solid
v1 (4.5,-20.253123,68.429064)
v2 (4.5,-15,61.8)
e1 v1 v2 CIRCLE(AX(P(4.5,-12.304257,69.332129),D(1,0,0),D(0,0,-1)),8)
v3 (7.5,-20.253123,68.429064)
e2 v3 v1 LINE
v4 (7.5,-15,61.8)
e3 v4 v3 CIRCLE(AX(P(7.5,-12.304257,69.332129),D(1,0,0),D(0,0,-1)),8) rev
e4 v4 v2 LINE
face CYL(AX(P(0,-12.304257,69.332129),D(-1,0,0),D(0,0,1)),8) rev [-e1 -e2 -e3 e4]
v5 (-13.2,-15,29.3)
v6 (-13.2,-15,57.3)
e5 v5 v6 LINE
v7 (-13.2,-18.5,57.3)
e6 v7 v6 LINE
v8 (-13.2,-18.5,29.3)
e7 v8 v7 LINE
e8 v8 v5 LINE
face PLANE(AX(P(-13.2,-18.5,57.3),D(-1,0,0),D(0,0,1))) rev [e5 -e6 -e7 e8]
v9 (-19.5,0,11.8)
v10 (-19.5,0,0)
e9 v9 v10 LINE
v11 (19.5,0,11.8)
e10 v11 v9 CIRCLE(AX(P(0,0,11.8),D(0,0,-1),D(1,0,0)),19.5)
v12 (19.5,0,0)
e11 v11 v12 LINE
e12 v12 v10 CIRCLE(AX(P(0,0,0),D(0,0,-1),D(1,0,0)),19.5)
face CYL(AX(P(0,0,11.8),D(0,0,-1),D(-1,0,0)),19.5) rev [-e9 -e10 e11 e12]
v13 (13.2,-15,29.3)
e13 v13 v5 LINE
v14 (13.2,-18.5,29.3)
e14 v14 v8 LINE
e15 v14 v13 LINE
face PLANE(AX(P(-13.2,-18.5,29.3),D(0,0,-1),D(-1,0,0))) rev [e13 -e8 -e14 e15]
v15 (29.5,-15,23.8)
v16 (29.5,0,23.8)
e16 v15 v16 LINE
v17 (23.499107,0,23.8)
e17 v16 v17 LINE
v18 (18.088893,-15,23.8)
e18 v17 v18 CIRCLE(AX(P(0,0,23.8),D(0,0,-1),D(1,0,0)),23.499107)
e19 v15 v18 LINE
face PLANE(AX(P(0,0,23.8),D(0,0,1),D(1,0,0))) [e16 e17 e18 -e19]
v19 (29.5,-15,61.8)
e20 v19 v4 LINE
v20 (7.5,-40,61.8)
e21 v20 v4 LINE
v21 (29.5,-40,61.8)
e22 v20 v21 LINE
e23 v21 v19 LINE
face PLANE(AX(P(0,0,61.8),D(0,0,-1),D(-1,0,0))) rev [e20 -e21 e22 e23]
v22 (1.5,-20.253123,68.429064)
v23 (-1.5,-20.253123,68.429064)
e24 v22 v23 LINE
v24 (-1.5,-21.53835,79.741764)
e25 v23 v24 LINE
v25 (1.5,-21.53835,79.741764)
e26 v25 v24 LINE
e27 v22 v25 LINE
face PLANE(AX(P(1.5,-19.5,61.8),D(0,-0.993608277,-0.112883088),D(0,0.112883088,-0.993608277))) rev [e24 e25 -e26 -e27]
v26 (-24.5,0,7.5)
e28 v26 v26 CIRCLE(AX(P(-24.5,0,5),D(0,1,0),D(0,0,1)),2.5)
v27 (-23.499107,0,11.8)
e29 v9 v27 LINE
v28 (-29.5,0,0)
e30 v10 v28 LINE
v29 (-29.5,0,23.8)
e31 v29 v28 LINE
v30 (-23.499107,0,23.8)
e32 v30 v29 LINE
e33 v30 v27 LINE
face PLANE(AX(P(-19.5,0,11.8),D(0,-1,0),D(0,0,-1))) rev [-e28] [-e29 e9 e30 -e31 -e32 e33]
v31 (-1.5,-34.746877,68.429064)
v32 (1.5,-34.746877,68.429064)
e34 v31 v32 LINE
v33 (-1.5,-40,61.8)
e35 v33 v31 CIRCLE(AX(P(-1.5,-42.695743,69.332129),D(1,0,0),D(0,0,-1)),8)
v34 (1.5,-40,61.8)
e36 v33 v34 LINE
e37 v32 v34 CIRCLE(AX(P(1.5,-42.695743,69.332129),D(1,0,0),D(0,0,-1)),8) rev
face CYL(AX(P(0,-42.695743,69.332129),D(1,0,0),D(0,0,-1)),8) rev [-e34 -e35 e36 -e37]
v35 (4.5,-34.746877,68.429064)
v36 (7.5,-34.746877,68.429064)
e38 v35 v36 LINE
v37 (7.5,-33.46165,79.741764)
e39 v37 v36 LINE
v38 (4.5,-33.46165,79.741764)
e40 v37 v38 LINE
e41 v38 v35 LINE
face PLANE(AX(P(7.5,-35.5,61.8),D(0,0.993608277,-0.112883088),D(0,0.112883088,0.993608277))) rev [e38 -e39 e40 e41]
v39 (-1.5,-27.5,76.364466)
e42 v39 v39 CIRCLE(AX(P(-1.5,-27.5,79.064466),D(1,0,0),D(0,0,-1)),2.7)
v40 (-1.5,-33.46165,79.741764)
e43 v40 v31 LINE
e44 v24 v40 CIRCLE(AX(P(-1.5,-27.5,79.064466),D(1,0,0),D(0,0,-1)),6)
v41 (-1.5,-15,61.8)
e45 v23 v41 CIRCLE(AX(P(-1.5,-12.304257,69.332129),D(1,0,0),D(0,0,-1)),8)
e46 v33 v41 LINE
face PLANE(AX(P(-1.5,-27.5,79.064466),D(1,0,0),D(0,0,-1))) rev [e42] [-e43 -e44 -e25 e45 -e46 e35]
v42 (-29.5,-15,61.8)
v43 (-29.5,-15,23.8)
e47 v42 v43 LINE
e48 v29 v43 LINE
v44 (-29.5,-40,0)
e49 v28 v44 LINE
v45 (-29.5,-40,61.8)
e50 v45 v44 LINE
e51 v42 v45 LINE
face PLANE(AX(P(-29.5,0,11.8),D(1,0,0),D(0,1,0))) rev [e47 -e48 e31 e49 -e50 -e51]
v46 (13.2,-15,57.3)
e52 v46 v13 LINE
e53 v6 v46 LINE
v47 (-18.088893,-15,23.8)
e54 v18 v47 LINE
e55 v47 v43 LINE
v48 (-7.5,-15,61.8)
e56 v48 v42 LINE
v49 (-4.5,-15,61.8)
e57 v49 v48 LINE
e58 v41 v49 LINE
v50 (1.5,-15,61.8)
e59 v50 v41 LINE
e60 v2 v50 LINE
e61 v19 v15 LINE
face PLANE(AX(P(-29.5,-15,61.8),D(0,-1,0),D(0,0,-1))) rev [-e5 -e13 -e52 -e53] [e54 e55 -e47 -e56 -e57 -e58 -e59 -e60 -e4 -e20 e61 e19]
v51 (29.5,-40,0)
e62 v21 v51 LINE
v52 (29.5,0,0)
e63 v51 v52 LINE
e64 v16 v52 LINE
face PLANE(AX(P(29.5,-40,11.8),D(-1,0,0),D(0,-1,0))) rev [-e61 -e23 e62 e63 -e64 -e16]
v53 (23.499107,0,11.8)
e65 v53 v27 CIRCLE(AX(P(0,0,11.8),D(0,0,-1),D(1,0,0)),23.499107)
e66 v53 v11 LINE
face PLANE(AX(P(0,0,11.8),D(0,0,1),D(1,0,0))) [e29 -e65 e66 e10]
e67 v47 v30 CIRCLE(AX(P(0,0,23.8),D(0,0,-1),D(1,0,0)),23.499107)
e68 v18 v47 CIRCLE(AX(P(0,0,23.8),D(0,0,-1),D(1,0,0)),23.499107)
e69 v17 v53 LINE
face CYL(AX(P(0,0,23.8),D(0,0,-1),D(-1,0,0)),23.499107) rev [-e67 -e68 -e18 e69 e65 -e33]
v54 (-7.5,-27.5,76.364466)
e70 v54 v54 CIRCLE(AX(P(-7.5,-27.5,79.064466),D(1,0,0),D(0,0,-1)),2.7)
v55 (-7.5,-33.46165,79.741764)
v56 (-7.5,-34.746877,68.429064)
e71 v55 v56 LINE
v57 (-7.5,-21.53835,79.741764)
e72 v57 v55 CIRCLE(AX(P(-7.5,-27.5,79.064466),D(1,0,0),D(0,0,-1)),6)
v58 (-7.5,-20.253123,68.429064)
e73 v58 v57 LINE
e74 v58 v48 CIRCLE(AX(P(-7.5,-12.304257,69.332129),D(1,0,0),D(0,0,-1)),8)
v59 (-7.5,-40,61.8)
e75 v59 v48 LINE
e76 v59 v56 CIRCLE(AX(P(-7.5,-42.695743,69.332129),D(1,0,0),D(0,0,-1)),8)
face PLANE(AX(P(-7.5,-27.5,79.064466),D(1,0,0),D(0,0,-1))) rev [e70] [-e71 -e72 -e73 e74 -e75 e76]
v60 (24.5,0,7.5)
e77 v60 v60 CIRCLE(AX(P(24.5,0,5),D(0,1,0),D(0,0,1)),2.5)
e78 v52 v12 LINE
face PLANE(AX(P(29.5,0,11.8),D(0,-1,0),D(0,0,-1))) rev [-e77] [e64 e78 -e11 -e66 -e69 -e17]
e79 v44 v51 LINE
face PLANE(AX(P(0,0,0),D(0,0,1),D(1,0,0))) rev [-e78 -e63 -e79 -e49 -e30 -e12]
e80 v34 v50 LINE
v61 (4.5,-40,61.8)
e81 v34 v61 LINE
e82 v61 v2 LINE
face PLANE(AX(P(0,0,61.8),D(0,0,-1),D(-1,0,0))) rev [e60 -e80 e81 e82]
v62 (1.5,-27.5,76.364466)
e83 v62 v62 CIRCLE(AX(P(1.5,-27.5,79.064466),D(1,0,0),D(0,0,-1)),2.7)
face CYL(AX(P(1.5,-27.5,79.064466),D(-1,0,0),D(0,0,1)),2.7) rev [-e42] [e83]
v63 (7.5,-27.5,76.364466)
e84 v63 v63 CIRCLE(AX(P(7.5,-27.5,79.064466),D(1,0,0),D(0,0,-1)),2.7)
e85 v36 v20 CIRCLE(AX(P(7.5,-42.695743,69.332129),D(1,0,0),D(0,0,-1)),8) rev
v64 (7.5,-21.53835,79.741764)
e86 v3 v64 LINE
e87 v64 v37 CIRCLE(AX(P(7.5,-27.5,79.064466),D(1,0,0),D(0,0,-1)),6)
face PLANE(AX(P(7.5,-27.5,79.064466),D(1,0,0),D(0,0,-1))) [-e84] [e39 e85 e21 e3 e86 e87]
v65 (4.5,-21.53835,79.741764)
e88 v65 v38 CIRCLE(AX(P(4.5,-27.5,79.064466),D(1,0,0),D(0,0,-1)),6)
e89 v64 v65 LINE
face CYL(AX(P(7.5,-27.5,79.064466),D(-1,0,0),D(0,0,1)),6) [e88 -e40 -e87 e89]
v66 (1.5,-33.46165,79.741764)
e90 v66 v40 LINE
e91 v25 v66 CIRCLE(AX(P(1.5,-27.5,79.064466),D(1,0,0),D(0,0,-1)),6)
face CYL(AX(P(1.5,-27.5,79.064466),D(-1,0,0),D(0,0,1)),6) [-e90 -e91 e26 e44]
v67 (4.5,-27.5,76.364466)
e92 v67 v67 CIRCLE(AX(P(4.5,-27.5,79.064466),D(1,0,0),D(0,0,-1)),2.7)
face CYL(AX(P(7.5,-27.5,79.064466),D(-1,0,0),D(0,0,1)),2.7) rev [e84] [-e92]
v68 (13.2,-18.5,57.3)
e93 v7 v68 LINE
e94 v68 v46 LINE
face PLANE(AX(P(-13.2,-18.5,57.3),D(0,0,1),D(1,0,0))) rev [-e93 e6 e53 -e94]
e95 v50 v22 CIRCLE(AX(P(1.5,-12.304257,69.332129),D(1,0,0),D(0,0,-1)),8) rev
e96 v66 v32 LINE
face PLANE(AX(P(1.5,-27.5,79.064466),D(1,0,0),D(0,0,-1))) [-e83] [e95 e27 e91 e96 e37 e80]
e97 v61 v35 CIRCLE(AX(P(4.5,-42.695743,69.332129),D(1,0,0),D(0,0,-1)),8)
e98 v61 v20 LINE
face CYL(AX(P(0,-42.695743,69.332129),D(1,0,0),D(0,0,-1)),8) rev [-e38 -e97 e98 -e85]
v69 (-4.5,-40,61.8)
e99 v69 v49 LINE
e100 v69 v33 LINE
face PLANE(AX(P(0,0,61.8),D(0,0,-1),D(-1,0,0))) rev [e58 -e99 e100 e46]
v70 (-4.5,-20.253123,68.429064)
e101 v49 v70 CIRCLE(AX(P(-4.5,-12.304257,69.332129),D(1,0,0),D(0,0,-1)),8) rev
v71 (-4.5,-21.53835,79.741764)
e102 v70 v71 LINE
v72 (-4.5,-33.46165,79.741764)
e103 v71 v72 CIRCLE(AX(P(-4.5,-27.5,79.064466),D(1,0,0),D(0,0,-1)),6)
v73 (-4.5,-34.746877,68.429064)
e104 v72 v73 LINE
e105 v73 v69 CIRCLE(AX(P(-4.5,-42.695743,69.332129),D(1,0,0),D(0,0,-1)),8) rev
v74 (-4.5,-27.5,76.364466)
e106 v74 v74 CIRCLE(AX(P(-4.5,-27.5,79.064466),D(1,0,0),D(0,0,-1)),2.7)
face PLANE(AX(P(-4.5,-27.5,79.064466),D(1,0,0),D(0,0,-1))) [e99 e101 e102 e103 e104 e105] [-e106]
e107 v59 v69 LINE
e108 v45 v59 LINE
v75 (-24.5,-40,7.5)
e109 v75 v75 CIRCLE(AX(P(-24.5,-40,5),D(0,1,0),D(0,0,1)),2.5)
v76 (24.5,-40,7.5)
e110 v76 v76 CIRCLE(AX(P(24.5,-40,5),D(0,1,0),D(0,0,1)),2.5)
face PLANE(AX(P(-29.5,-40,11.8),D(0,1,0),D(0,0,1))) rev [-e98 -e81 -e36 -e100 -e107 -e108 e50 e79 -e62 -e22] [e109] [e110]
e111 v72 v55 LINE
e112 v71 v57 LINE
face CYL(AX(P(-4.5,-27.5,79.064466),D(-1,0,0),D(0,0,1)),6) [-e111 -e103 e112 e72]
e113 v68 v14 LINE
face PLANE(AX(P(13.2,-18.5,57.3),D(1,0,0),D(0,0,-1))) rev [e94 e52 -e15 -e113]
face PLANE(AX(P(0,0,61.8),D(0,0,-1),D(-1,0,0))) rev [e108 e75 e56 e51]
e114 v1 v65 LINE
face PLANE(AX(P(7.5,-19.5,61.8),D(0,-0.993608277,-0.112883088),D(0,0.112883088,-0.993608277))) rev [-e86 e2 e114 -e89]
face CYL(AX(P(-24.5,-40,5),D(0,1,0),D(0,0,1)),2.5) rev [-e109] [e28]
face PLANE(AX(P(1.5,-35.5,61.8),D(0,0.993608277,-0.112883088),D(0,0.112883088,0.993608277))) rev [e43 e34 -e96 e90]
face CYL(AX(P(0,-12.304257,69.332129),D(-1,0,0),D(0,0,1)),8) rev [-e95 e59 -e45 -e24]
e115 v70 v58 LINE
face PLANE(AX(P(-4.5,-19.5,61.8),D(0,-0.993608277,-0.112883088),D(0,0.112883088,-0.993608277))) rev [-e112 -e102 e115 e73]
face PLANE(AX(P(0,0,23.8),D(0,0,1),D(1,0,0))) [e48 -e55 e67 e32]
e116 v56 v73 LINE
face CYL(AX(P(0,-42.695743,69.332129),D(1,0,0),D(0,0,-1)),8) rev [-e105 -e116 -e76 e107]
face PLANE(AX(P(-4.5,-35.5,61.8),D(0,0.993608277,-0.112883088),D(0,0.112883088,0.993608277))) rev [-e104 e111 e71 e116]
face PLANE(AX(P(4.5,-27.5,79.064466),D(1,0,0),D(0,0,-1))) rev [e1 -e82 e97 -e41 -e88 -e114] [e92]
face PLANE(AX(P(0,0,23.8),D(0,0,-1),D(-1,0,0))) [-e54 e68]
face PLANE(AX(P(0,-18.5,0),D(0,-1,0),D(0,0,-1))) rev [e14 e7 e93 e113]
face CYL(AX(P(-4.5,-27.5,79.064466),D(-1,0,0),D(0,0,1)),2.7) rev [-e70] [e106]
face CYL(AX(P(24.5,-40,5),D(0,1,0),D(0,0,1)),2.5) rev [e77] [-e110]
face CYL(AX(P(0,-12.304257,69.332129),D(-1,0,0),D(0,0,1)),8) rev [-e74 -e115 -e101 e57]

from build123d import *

# Parameters (mm, degrees)
BOSS_EXTRUDE1_DEPTH = 11.8
BOSS_EXTRUDE2_DEPTH = 12
SKETCH3_W           = 59
SKETCH3_H           = 25
BOSS_EXTRUDE3_DEPTH = 38
SKETCH4_W           = 26.4
SKETCH4_H           = 28
CUT_EXTRUDE1_DEPTH  = 3.5
SKETCH5_R           = 2.5
CUT_EXTRUDE2_DEPTH  = 80.30630492
SKETCH6_R           = 2.7
BOSS_EXTRUDE4_DEPTH = 1.5
LPATTERN1_COUNT     = 2
LPATTERN1_PITCH     = 6
LPATTERN1_COL_COUNT = 2
LPATTERN1_COL_PITCH = 6
FILLET1_R           = 8


with BuildPart() as part:
    # Sketch1 → Boss-Extrude1 (new body)
    with BuildSketch(Plane.XY):
        with BuildLine():
            Line((-19.5, 0), (-29.5, 0))
            Line((-29.5, 0), (-29.5, -40))
            Line((-29.5, -40), (29.5, -40))
            Line((29.5, -40), (29.5, 0))
            Line((29.5, 0), (19.5, 0))
            ThreePointArc((19.5, 0), (0, -19.5), (-19.5, 0))
        make_face()
    extrude(amount=BOSS_EXTRUDE1_DEPTH)

    # Sketch2 → Boss-Extrude2 (add)
    with BuildSketch(Plane.XY.offset(11.8)):
        with BuildLine():
            Line((23.499107394, 0), (29.5, 0))
            Line((29.5, 0), (29.5, -40))
            Line((29.5, -40), (-29.5, -40))
            Line((-29.5, -40), (-29.5, 0))
            Line((-29.5, 0), (-23.499107394, 0))
            ThreePointArc((-23.499107394, 0), (0, -23.499107394), (23.499107394, 0))
        make_face()
    extrude(amount=BOSS_EXTRUDE2_DEPTH)

    # Sketch3 → Boss-Extrude3 (add)
    with BuildSketch(Plane.XY.offset(23.8)):
        with Locations((0, -27.5)):
            Rectangle(SKETCH3_W, SKETCH3_H)
    extrude(amount=BOSS_EXTRUDE3_DEPTH)

    # Sketch4 → Cut-Extrude1 (cut)
    with BuildSketch(Plane(origin=(0, -15, 0), x_dir=(1, 0, 0), z_dir=(0, 1, 0))):
        with Locations((0, -43.3)):
            Rectangle(SKETCH4_W, SKETCH4_H)
    extrude(amount=-CUT_EXTRUDE1_DEPTH, mode=Mode.SUBTRACT)

    # Sketch5 → Cut-Extrude2 (cut, through all)
    with BuildSketch(Plane(origin=(0, 0, 0), x_dir=(1, 0, 0), z_dir=(0, 1, 0))):
        with Locations(Location((-24.5, -5, 0), (0, 0, 270))):
            Circle(SKETCH5_R)
        with Locations(Location((24.5, -5, 0), (0, 0, 270))):
            Circle(SKETCH5_R)
    extrude(amount=-CUT_EXTRUDE2_DEPTH, mode=Mode.SUBTRACT)

    # Sketch6 → Boss-Extrude4 (add, symmetric)
    with BuildSketch(Plane(origin=(0, 0, 0), x_dir=(0, 0, -1), z_dir=(1, 0, 0))):
        with BuildLine():
            Line((-61.8, -19.5), (-79.74176436, -21.538350337))
            ThreePointArc((-79.74176436, -21.538350337), (-85.064465832, -27.5), (-79.74176436, -33.461649663))
            Line((-79.74176436, -33.461649663), (-61.8, -35.5))
            Line((-61.8, -35.5), (-61.8, -19.5))
        make_face()
        with Locations((-79.064465832, -27.5)):
            Circle(SKETCH6_R, mode=Mode.SUBTRACT)
    boss_extrude4 = extrude(amount=BOSS_EXTRUDE4_DEPTH, both=True)

    # LPattern1: Boss-Extrude4 ×2
    with Locations(*[(-i * LPATTERN1_PITCH, 0, 0) for i in range(1, LPATTERN1_COUNT)]):
        add(boss_extrude4)

    # LPattern1 col: Boss-Extrude4 ×2
    with Locations(*[(i * LPATTERN1_COL_PITCH, 0, 0) for i in range(1, LPATTERN1_COL_COUNT)]):
        add(boss_extrude4)

    # Fillet1
    # the kernel refuses this fillet: 8 mm, written as the material it adds along each edge
    with BuildSketch(Plane(origin=(-7.5, -35.5, 61.8), x_dir=(0, -1, 0), z_dir=(1, 0, 0)), Plane(origin=(-1.5, -35.5, 61.8), x_dir=(0, -1, 0), z_dir=(1, 0, 0)), Plane(origin=(4.5, -35.5, 61.8), x_dir=(0, -1, 0), z_dir=(1, 0, 0))) as fillet1_piece_1:
        with BuildLine():
            CenterArc((7.195743205, -7.532129086), FILLET1_R, 109.69224948, 63.826210699)
            Line((-0.753123012, -6.629064382), (-0.912100336, -6.611003087))
            Line((-0.912100336, -6.611003087), (-0.158977324, 0.018061294))
            Line((-0.158977324, 0.018061294), (0, 0.16))
            ThreePointArc((0, 0.16), (2.25, 0.16), (4.446085136, 0.150642582))
            Line((4.446085136, 0.150642582), (4.5, 0))
        make_face()
    extrude(amount=3)
    with BuildSketch(Plane(origin=(-7.5, -35.5, 61.8), x_dir=(0, -1, 0), z_dir=(1, 0, 0))) as fillet1_piece_2_section:
        with BuildLine():
            CenterArc((7.195743205, -7.532129086), FILLET1_R, 109.69224948, 63.826210699)
            Line((-0.753123012, -6.629064382), (-0.912100336, -6.611003087))
            Line((-0.912100336, -6.611003087), (-0.158977324, 0.018061294))
            Line((-0.158977324, 0.018061294), (0, 0.16))
            ThreePointArc((0, 0.16), (2.25, 0.16), (4.446085136, 0.150642582))
            Line((4.446085136, 0.150642582), (4.5, 0))
        make_face()
    fillet1_piece_2 = extrude(amount=19.679270227, mode=Mode.PRIVATE)
    fillet1_piece_2 = split(fillet1_piece_2, bisect_by=Plane(origin=(-1.5, -36.458947271, 63.391764359), z_dir=(1, 0, 0)), keep=Keep.TOP, mode=Mode.PRIVATE)
    fillet1_piece_2 = split(fillet1_piece_2, bisect_by=Plane(origin=(1.5, -36.458947271, 63.391764359), z_dir=(-1, 0, 0)), keep=Keep.TOP, mode=Mode.PRIVATE)
    add(fillet1_piece_2)
    with BuildSketch(Plane(origin=(-7.5, -35.5, 61.8), x_dir=(0, -1, 0), z_dir=(1, 0, 0))) as fillet1_piece_3_section:
        with BuildLine():
            CenterArc((7.195743205, -7.532129086), FILLET1_R, 109.69224948, 63.826210699)
            Line((-0.753123012, -6.629064382), (-0.912100336, -6.611003087))
            Line((-0.912100336, -6.611003087), (-0.158977324, 0.018061294))
            Line((-0.158977324, 0.018061294), (0, 0.16))
            ThreePointArc((0, 0.16), (2.25, 0.16), (4.446085136, 0.150642582))
            Line((4.446085136, 0.150642582), (4.5, 0))
        make_face()
    fillet1_piece_3 = extrude(amount=19.679270227, mode=Mode.PRIVATE)
    fillet1_piece_3 = split(fillet1_piece_3, bisect_by=Plane(origin=(4.5, -36.458947271, 63.391764359), z_dir=(1, 0, 0)), keep=Keep.TOP, mode=Mode.PRIVATE)
    fillet1_piece_3 = split(fillet1_piece_3, bisect_by=Plane(origin=(7.5, -36.458947271, 63.391764359), z_dir=(-1, 0, 0)), keep=Keep.TOP, mode=Mode.PRIVATE)
    add(fillet1_piece_3)
    with BuildSketch(Plane(origin=(-7.5, -19.5, 61.8), x_dir=(0, 1, 0), z_dir=(1, 0, 0)), Plane(origin=(-1.5, -19.5, 61.8), x_dir=(0, 1, 0), z_dir=(1, 0, 0)), Plane(origin=(4.5, -19.5, 61.8), x_dir=(0, 1, 0), z_dir=(1, 0, 0))) as fillet1_piece_4:
        with BuildLine():
            CenterArc((7.195743205, 7.532129086), FILLET1_R, 186.481539821, 63.826210699)
            Line((-0.753123012, 6.629064382), (-0.912100336, 6.611003087))
            Line((-0.912100336, 6.611003087), (-0.158977324, -0.018061294))
            Line((-0.158977324, -0.018061294), (0, -0.16))
            ThreePointArc((0, -0.16), (2.25, -0.16), (4.446085136, -0.150642582))
            Line((4.446085136, -0.150642582), (4.5, 0))
        make_face()
    extrude(amount=3)
    with BuildSketch(Plane(origin=(-7.5, -19.5, 61.8), x_dir=(0, 1, 0), z_dir=(1, 0, 0))) as fillet1_piece_5_section:
        with BuildLine():
            CenterArc((7.195743205, 7.532129086), FILLET1_R, 186.481539821, 63.826210699)
            Line((-0.753123012, 6.629064382), (-0.912100336, 6.611003087))
            Line((-0.912100336, 6.611003087), (-0.158977324, -0.018061294))
            Line((-0.158977324, -0.018061294), (0, -0.16))
            ThreePointArc((0, -0.16), (2.25, -0.16), (4.446085136, -0.150642582))
            Line((4.446085136, -0.150642582), (4.5, 0))
        make_face()
    fillet1_piece_5 = extrude(amount=19.679270227, mode=Mode.PRIVATE)
    fillet1_piece_5 = split(fillet1_piece_5, bisect_by=Plane(origin=(-1.5, -18.541052729, 63.391764359), z_dir=(1, 0, 0)), keep=Keep.TOP, mode=Mode.PRIVATE)
    fillet1_piece_5 = split(fillet1_piece_5, bisect_by=Plane(origin=(1.5, -18.541052729, 63.391764359), z_dir=(-1, 0, 0)), keep=Keep.TOP, mode=Mode.PRIVATE)
    add(fillet1_piece_5)
    with BuildSketch(Plane(origin=(-7.5, -19.5, 61.8), x_dir=(0, 1, 0), z_dir=(1, 0, 0))) as fillet1_piece_6_section:
        with BuildLine():
            CenterArc((7.195743205, 7.532129086), FILLET1_R, 186.481539821, 63.826210699)
            Line((-0.753123012, 6.629064382), (-0.912100336, 6.611003087))
            Line((-0.912100336, 6.611003087), (-0.158977324, -0.018061294))
            Line((-0.158977324, -0.018061294), (0, -0.16))
            ThreePointArc((0, -0.16), (2.25, -0.16), (4.446085136, -0.150642582))
            Line((4.446085136, -0.150642582), (4.5, 0))
        make_face()
    fillet1_piece_6 = extrude(amount=19.679270227, mode=Mode.PRIVATE)
    fillet1_piece_6 = split(fillet1_piece_6, bisect_by=Plane(origin=(7.5, -18.541052729, 63.391764359), z_dir=(-1, 0, 0)), keep=Keep.TOP, mode=Mode.PRIVATE)
    fillet1_piece_6 = split(fillet1_piece_6, bisect_by=Plane(origin=(4.5, -18.541052729, 63.391764359), z_dir=(1, 0, 0)), keep=Keep.TOP, mode=Mode.PRIVATE)
    add(fillet1_piece_6)
    with BuildSketch(Plane(origin=(-18.179270227, -35.5, 61.8), x_dir=(0, -1, 0), z_dir=(1, 0, 0))) as fillet1_piece_7_section:
        with BuildLine():
            CenterArc((7.195743205, -7.532129086), FILLET1_R, 109.69224948, 63.826210699)
            Line((-0.753123012, -6.629064382), (-0.912100336, -6.611003087))
            Line((-0.912100336, -6.611003087), (-0.158977324, 0.018061294))
            Line((-0.158977324, 0.018061294), (0, 0.16))
            ThreePointArc((0, 0.16), (2.25, 0.16), (4.446085136, 0.150642582))
            Line((4.446085136, 0.150642582), (4.5, 0))
        make_face()
    fillet1_piece_7 = extrude(amount=19.679270227, mode=Mode.PRIVATE)
    fillet1_piece_7 = split(fillet1_piece_7, bisect_by=Plane(origin=(-7.5, -36.458947271, 63.391764359), z_dir=(1, 0, 0)), keep=Keep.TOP, mode=Mode.PRIVATE)
    fillet1_piece_7 = split(fillet1_piece_7, bisect_by=Plane(origin=(-4.5, -36.458947271, 63.391764359), z_dir=(-1, 0, 0)), keep=Keep.TOP, mode=Mode.PRIVATE)
    add(fillet1_piece_7)
    with BuildSketch(Plane(origin=(-1.5, -35.5, 61.8), x_dir=(0, -1, 0), z_dir=(1, 0, 0))) as fillet1_piece_8_section:
        with BuildLine():
            CenterArc((7.195743205, -7.532129086), FILLET1_R, 109.69224948, 63.826210699)
            Line((-0.753123012, -6.629064382), (-0.912100336, -6.611003087))
            Line((-0.912100336, -6.611003087), (-0.158977324, 0.018061294))
            Line((-0.158977324, 0.018061294), (0, 0.16))
            ThreePointArc((0, 0.16), (2.25, 0.16), (4.446085136, 0.150642582))
            Line((4.446085136, 0.150642582), (4.5, 0))
        make_face()
    fillet1_piece_8 = extrude(amount=19.679270227, mode=Mode.PRIVATE)
    fillet1_piece_8 = split(fillet1_piece_8, bisect_by=Plane(origin=(4.5, -36.458947271, 63.391764359), z_dir=(1, 0, 0)), keep=Keep.TOP, mode=Mode.PRIVATE)
    fillet1_piece_8 = split(fillet1_piece_8, bisect_by=Plane(origin=(7.5, -36.458947271, 63.391764359), z_dir=(-1, 0, 0)), keep=Keep.TOP, mode=Mode.PRIVATE)
    add(fillet1_piece_8)
    with BuildSketch(Plane(origin=(-18.179270227, -19.5, 61.8), x_dir=(0, 1, 0), z_dir=(1, 0, 0))) as fillet1_piece_9_section:
        with BuildLine():
            CenterArc((7.195743205, 7.532129086), FILLET1_R, 186.481539821, 63.826210699)
            Line((-0.753123012, 6.629064382), (-0.912100336, 6.611003087))
            Line((-0.912100336, 6.611003087), (-0.158977324, -0.018061294))
            Line((-0.158977324, -0.018061294), (0, -0.16))
            ThreePointArc((0, -0.16), (2.25, -0.16), (4.446085136, -0.150642582))
            Line((4.446085136, -0.150642582), (4.5, 0))
        make_face()
    fillet1_piece_9 = extrude(amount=19.679270227, mode=Mode.PRIVATE)
    fillet1_piece_9 = split(fillet1_piece_9, bisect_by=Plane(origin=(-7.5, -18.541052729, 63.391764359), z_dir=(1, 0, 0)), keep=Keep.TOP, mode=Mode.PRIVATE)
    fillet1_piece_9 = split(fillet1_piece_9, bisect_by=Plane(origin=(-4.5, -18.541052729, 63.391764359), z_dir=(-1, 0, 0)), keep=Keep.TOP, mode=Mode.PRIVATE)
    add(fillet1_piece_9)
    with BuildSketch(Plane(origin=(-1.5, -19.5, 61.8), x_dir=(0, 1, 0), z_dir=(1, 0, 0))) as fillet1_piece_10_section:
        with BuildLine():
            CenterArc((7.195743205, 7.532129086), FILLET1_R, 186.481539821, 63.826210699)
            Line((-0.753123012, 6.629064382), (-0.912100336, 6.611003087))
            Line((-0.912100336, 6.611003087), (-0.158977324, -0.018061294))
            Line((-0.158977324, -0.018061294), (0, -0.16))
            ThreePointArc((0, -0.16), (2.25, -0.16), (4.446085136, -0.150642582))
            Line((4.446085136, -0.150642582), (4.5, 0))
        make_face()
    fillet1_piece_10 = extrude(amount=19.679270227, mode=Mode.PRIVATE)
    fillet1_piece_10 = split(fillet1_piece_10, bisect_by=Plane(origin=(7.5, -18.541052729, 63.391764359), z_dir=(-1, 0, 0)), keep=Keep.TOP, mode=Mode.PRIVATE)
    fillet1_piece_10 = split(fillet1_piece_10, bisect_by=Plane(origin=(4.5, -18.541052729, 63.391764359), z_dir=(1, 0, 0)), keep=Keep.TOP, mode=Mode.PRIVATE)
    add(fillet1_piece_10)
    with BuildSketch(Plane(origin=(-12.179270227, -35.5, 61.8), x_dir=(0, -1, 0), z_dir=(1, 0, 0))) as fillet1_piece_11_section:
        with BuildLine():
            CenterArc((7.195743205, -7.532129086), FILLET1_R, 109.69224948, 63.826210699)
            Line((-0.753123012, -6.629064382), (-0.912100336, -6.611003087))
            Line((-0.912100336, -6.611003087), (-0.158977324, 0.018061294))
            Line((-0.158977324, 0.018061294), (0, 0.16))
            ThreePointArc((0, 0.16), (2.25, 0.16), (4.446085136, 0.150642582))
            Line((4.446085136, 0.150642582), (4.5, 0))
        make_face()
    fillet1_piece_11 = extrude(amount=19.679270227, mode=Mode.PRIVATE)
    fillet1_piece_11 = split(fillet1_piece_11, bisect_by=Plane(origin=(-7.5, -36.458947271, 63.391764359), z_dir=(1, 0, 0)), keep=Keep.TOP, mode=Mode.PRIVATE)
    fillet1_piece_11 = split(fillet1_piece_11, bisect_by=Plane(origin=(-4.5, -36.458947271, 63.391764359), z_dir=(-1, 0, 0)), keep=Keep.TOP, mode=Mode.PRIVATE)
    add(fillet1_piece_11)
    with BuildSketch(Plane(origin=(-12.179270227, -35.5, 61.8), x_dir=(0, -1, 0), z_dir=(1, 0, 0))) as fillet1_piece_12_section:
        with BuildLine():
            CenterArc((7.195743205, -7.532129086), FILLET1_R, 109.69224948, 63.826210699)
            Line((-0.753123012, -6.629064382), (-0.912100336, -6.611003087))
            Line((-0.912100336, -6.611003087), (-0.158977324, 0.018061294))
            Line((-0.158977324, 0.018061294), (0, 0.16))
            ThreePointArc((0, 0.16), (2.25, 0.16), (4.446085136, 0.150642582))
            Line((4.446085136, 0.150642582), (4.5, 0))
        make_face()
    fillet1_piece_12 = extrude(amount=19.679270227, mode=Mode.PRIVATE)
    fillet1_piece_12 = split(fillet1_piece_12, bisect_by=Plane(origin=(-1.5, -36.458947271, 63.391764359), z_dir=(1, 0, 0)), keep=Keep.TOP, mode=Mode.PRIVATE)
    fillet1_piece_12 = split(fillet1_piece_12, bisect_by=Plane(origin=(1.5, -36.458947271, 63.391764359), z_dir=(-1, 0, 0)), keep=Keep.TOP, mode=Mode.PRIVATE)
    add(fillet1_piece_12)
    with BuildSketch(Plane(origin=(-12.179270227, -19.5, 61.8), x_dir=(0, 1, 0), z_dir=(1, 0, 0))) as fillet1_piece_13_section:
        with BuildLine():
            CenterArc((7.195743205, 7.532129086), FILLET1_R, 186.481539821, 63.826210699)
            Line((-0.753123012, 6.629064382), (-0.912100336, 6.611003087))
            Line((-0.912100336, 6.611003087), (-0.158977324, -0.018061294))
            Line((-0.158977324, -0.018061294), (0, -0.16))
            ThreePointArc((0, -0.16), (2.25, -0.16), (4.446085136, -0.150642582))
            Line((4.446085136, -0.150642582), (4.5, 0))
        make_face()
    fillet1_piece_13 = extrude(amount=19.679270227, mode=Mode.PRIVATE)
    fillet1_piece_13 = split(fillet1_piece_13, bisect_by=Plane(origin=(-7.5, -18.541052729, 63.391764359), z_dir=(1, 0, 0)), keep=Keep.TOP, mode=Mode.PRIVATE)
    fillet1_piece_13 = split(fillet1_piece_13, bisect_by=Plane(origin=(-4.5, -18.541052729, 63.391764359), z_dir=(-1, 0, 0)), keep=Keep.TOP, mode=Mode.PRIVATE)
    add(fillet1_piece_13)
    with BuildSketch(Plane(origin=(-12.179270227, -19.5, 61.8), x_dir=(0, 1, 0), z_dir=(1, 0, 0))) as fillet1_piece_14_section:
        with BuildLine():
            CenterArc((7.195743205, 7.532129086), FILLET1_R, 186.481539821, 63.826210699)
            Line((-0.753123012, 6.629064382), (-0.912100336, 6.611003087))
            Line((-0.912100336, 6.611003087), (-0.158977324, -0.018061294))
            Line((-0.158977324, -0.018061294), (0, -0.16))
            ThreePointArc((0, -0.16), (2.25, -0.16), (4.446085136, -0.150642582))
            Line((4.446085136, -0.150642582), (4.5, 0))
        make_face()
    fillet1_piece_14 = extrude(amount=19.679270227, mode=Mode.PRIVATE)
    fillet1_piece_14 = split(fillet1_piece_14, bisect_by=Plane(origin=(-1.5, -18.541052729, 63.391764359), z_dir=(1, 0, 0)), keep=Keep.TOP, mode=Mode.PRIVATE)
    fillet1_piece_14 = split(fillet1_piece_14, bisect_by=Plane(origin=(1.5, -18.541052729, 63.391764359), z_dir=(-1, 0, 0)), keep=Keep.TOP, mode=Mode.PRIVATE)
    add(fillet1_piece_14)


solid = part.part
